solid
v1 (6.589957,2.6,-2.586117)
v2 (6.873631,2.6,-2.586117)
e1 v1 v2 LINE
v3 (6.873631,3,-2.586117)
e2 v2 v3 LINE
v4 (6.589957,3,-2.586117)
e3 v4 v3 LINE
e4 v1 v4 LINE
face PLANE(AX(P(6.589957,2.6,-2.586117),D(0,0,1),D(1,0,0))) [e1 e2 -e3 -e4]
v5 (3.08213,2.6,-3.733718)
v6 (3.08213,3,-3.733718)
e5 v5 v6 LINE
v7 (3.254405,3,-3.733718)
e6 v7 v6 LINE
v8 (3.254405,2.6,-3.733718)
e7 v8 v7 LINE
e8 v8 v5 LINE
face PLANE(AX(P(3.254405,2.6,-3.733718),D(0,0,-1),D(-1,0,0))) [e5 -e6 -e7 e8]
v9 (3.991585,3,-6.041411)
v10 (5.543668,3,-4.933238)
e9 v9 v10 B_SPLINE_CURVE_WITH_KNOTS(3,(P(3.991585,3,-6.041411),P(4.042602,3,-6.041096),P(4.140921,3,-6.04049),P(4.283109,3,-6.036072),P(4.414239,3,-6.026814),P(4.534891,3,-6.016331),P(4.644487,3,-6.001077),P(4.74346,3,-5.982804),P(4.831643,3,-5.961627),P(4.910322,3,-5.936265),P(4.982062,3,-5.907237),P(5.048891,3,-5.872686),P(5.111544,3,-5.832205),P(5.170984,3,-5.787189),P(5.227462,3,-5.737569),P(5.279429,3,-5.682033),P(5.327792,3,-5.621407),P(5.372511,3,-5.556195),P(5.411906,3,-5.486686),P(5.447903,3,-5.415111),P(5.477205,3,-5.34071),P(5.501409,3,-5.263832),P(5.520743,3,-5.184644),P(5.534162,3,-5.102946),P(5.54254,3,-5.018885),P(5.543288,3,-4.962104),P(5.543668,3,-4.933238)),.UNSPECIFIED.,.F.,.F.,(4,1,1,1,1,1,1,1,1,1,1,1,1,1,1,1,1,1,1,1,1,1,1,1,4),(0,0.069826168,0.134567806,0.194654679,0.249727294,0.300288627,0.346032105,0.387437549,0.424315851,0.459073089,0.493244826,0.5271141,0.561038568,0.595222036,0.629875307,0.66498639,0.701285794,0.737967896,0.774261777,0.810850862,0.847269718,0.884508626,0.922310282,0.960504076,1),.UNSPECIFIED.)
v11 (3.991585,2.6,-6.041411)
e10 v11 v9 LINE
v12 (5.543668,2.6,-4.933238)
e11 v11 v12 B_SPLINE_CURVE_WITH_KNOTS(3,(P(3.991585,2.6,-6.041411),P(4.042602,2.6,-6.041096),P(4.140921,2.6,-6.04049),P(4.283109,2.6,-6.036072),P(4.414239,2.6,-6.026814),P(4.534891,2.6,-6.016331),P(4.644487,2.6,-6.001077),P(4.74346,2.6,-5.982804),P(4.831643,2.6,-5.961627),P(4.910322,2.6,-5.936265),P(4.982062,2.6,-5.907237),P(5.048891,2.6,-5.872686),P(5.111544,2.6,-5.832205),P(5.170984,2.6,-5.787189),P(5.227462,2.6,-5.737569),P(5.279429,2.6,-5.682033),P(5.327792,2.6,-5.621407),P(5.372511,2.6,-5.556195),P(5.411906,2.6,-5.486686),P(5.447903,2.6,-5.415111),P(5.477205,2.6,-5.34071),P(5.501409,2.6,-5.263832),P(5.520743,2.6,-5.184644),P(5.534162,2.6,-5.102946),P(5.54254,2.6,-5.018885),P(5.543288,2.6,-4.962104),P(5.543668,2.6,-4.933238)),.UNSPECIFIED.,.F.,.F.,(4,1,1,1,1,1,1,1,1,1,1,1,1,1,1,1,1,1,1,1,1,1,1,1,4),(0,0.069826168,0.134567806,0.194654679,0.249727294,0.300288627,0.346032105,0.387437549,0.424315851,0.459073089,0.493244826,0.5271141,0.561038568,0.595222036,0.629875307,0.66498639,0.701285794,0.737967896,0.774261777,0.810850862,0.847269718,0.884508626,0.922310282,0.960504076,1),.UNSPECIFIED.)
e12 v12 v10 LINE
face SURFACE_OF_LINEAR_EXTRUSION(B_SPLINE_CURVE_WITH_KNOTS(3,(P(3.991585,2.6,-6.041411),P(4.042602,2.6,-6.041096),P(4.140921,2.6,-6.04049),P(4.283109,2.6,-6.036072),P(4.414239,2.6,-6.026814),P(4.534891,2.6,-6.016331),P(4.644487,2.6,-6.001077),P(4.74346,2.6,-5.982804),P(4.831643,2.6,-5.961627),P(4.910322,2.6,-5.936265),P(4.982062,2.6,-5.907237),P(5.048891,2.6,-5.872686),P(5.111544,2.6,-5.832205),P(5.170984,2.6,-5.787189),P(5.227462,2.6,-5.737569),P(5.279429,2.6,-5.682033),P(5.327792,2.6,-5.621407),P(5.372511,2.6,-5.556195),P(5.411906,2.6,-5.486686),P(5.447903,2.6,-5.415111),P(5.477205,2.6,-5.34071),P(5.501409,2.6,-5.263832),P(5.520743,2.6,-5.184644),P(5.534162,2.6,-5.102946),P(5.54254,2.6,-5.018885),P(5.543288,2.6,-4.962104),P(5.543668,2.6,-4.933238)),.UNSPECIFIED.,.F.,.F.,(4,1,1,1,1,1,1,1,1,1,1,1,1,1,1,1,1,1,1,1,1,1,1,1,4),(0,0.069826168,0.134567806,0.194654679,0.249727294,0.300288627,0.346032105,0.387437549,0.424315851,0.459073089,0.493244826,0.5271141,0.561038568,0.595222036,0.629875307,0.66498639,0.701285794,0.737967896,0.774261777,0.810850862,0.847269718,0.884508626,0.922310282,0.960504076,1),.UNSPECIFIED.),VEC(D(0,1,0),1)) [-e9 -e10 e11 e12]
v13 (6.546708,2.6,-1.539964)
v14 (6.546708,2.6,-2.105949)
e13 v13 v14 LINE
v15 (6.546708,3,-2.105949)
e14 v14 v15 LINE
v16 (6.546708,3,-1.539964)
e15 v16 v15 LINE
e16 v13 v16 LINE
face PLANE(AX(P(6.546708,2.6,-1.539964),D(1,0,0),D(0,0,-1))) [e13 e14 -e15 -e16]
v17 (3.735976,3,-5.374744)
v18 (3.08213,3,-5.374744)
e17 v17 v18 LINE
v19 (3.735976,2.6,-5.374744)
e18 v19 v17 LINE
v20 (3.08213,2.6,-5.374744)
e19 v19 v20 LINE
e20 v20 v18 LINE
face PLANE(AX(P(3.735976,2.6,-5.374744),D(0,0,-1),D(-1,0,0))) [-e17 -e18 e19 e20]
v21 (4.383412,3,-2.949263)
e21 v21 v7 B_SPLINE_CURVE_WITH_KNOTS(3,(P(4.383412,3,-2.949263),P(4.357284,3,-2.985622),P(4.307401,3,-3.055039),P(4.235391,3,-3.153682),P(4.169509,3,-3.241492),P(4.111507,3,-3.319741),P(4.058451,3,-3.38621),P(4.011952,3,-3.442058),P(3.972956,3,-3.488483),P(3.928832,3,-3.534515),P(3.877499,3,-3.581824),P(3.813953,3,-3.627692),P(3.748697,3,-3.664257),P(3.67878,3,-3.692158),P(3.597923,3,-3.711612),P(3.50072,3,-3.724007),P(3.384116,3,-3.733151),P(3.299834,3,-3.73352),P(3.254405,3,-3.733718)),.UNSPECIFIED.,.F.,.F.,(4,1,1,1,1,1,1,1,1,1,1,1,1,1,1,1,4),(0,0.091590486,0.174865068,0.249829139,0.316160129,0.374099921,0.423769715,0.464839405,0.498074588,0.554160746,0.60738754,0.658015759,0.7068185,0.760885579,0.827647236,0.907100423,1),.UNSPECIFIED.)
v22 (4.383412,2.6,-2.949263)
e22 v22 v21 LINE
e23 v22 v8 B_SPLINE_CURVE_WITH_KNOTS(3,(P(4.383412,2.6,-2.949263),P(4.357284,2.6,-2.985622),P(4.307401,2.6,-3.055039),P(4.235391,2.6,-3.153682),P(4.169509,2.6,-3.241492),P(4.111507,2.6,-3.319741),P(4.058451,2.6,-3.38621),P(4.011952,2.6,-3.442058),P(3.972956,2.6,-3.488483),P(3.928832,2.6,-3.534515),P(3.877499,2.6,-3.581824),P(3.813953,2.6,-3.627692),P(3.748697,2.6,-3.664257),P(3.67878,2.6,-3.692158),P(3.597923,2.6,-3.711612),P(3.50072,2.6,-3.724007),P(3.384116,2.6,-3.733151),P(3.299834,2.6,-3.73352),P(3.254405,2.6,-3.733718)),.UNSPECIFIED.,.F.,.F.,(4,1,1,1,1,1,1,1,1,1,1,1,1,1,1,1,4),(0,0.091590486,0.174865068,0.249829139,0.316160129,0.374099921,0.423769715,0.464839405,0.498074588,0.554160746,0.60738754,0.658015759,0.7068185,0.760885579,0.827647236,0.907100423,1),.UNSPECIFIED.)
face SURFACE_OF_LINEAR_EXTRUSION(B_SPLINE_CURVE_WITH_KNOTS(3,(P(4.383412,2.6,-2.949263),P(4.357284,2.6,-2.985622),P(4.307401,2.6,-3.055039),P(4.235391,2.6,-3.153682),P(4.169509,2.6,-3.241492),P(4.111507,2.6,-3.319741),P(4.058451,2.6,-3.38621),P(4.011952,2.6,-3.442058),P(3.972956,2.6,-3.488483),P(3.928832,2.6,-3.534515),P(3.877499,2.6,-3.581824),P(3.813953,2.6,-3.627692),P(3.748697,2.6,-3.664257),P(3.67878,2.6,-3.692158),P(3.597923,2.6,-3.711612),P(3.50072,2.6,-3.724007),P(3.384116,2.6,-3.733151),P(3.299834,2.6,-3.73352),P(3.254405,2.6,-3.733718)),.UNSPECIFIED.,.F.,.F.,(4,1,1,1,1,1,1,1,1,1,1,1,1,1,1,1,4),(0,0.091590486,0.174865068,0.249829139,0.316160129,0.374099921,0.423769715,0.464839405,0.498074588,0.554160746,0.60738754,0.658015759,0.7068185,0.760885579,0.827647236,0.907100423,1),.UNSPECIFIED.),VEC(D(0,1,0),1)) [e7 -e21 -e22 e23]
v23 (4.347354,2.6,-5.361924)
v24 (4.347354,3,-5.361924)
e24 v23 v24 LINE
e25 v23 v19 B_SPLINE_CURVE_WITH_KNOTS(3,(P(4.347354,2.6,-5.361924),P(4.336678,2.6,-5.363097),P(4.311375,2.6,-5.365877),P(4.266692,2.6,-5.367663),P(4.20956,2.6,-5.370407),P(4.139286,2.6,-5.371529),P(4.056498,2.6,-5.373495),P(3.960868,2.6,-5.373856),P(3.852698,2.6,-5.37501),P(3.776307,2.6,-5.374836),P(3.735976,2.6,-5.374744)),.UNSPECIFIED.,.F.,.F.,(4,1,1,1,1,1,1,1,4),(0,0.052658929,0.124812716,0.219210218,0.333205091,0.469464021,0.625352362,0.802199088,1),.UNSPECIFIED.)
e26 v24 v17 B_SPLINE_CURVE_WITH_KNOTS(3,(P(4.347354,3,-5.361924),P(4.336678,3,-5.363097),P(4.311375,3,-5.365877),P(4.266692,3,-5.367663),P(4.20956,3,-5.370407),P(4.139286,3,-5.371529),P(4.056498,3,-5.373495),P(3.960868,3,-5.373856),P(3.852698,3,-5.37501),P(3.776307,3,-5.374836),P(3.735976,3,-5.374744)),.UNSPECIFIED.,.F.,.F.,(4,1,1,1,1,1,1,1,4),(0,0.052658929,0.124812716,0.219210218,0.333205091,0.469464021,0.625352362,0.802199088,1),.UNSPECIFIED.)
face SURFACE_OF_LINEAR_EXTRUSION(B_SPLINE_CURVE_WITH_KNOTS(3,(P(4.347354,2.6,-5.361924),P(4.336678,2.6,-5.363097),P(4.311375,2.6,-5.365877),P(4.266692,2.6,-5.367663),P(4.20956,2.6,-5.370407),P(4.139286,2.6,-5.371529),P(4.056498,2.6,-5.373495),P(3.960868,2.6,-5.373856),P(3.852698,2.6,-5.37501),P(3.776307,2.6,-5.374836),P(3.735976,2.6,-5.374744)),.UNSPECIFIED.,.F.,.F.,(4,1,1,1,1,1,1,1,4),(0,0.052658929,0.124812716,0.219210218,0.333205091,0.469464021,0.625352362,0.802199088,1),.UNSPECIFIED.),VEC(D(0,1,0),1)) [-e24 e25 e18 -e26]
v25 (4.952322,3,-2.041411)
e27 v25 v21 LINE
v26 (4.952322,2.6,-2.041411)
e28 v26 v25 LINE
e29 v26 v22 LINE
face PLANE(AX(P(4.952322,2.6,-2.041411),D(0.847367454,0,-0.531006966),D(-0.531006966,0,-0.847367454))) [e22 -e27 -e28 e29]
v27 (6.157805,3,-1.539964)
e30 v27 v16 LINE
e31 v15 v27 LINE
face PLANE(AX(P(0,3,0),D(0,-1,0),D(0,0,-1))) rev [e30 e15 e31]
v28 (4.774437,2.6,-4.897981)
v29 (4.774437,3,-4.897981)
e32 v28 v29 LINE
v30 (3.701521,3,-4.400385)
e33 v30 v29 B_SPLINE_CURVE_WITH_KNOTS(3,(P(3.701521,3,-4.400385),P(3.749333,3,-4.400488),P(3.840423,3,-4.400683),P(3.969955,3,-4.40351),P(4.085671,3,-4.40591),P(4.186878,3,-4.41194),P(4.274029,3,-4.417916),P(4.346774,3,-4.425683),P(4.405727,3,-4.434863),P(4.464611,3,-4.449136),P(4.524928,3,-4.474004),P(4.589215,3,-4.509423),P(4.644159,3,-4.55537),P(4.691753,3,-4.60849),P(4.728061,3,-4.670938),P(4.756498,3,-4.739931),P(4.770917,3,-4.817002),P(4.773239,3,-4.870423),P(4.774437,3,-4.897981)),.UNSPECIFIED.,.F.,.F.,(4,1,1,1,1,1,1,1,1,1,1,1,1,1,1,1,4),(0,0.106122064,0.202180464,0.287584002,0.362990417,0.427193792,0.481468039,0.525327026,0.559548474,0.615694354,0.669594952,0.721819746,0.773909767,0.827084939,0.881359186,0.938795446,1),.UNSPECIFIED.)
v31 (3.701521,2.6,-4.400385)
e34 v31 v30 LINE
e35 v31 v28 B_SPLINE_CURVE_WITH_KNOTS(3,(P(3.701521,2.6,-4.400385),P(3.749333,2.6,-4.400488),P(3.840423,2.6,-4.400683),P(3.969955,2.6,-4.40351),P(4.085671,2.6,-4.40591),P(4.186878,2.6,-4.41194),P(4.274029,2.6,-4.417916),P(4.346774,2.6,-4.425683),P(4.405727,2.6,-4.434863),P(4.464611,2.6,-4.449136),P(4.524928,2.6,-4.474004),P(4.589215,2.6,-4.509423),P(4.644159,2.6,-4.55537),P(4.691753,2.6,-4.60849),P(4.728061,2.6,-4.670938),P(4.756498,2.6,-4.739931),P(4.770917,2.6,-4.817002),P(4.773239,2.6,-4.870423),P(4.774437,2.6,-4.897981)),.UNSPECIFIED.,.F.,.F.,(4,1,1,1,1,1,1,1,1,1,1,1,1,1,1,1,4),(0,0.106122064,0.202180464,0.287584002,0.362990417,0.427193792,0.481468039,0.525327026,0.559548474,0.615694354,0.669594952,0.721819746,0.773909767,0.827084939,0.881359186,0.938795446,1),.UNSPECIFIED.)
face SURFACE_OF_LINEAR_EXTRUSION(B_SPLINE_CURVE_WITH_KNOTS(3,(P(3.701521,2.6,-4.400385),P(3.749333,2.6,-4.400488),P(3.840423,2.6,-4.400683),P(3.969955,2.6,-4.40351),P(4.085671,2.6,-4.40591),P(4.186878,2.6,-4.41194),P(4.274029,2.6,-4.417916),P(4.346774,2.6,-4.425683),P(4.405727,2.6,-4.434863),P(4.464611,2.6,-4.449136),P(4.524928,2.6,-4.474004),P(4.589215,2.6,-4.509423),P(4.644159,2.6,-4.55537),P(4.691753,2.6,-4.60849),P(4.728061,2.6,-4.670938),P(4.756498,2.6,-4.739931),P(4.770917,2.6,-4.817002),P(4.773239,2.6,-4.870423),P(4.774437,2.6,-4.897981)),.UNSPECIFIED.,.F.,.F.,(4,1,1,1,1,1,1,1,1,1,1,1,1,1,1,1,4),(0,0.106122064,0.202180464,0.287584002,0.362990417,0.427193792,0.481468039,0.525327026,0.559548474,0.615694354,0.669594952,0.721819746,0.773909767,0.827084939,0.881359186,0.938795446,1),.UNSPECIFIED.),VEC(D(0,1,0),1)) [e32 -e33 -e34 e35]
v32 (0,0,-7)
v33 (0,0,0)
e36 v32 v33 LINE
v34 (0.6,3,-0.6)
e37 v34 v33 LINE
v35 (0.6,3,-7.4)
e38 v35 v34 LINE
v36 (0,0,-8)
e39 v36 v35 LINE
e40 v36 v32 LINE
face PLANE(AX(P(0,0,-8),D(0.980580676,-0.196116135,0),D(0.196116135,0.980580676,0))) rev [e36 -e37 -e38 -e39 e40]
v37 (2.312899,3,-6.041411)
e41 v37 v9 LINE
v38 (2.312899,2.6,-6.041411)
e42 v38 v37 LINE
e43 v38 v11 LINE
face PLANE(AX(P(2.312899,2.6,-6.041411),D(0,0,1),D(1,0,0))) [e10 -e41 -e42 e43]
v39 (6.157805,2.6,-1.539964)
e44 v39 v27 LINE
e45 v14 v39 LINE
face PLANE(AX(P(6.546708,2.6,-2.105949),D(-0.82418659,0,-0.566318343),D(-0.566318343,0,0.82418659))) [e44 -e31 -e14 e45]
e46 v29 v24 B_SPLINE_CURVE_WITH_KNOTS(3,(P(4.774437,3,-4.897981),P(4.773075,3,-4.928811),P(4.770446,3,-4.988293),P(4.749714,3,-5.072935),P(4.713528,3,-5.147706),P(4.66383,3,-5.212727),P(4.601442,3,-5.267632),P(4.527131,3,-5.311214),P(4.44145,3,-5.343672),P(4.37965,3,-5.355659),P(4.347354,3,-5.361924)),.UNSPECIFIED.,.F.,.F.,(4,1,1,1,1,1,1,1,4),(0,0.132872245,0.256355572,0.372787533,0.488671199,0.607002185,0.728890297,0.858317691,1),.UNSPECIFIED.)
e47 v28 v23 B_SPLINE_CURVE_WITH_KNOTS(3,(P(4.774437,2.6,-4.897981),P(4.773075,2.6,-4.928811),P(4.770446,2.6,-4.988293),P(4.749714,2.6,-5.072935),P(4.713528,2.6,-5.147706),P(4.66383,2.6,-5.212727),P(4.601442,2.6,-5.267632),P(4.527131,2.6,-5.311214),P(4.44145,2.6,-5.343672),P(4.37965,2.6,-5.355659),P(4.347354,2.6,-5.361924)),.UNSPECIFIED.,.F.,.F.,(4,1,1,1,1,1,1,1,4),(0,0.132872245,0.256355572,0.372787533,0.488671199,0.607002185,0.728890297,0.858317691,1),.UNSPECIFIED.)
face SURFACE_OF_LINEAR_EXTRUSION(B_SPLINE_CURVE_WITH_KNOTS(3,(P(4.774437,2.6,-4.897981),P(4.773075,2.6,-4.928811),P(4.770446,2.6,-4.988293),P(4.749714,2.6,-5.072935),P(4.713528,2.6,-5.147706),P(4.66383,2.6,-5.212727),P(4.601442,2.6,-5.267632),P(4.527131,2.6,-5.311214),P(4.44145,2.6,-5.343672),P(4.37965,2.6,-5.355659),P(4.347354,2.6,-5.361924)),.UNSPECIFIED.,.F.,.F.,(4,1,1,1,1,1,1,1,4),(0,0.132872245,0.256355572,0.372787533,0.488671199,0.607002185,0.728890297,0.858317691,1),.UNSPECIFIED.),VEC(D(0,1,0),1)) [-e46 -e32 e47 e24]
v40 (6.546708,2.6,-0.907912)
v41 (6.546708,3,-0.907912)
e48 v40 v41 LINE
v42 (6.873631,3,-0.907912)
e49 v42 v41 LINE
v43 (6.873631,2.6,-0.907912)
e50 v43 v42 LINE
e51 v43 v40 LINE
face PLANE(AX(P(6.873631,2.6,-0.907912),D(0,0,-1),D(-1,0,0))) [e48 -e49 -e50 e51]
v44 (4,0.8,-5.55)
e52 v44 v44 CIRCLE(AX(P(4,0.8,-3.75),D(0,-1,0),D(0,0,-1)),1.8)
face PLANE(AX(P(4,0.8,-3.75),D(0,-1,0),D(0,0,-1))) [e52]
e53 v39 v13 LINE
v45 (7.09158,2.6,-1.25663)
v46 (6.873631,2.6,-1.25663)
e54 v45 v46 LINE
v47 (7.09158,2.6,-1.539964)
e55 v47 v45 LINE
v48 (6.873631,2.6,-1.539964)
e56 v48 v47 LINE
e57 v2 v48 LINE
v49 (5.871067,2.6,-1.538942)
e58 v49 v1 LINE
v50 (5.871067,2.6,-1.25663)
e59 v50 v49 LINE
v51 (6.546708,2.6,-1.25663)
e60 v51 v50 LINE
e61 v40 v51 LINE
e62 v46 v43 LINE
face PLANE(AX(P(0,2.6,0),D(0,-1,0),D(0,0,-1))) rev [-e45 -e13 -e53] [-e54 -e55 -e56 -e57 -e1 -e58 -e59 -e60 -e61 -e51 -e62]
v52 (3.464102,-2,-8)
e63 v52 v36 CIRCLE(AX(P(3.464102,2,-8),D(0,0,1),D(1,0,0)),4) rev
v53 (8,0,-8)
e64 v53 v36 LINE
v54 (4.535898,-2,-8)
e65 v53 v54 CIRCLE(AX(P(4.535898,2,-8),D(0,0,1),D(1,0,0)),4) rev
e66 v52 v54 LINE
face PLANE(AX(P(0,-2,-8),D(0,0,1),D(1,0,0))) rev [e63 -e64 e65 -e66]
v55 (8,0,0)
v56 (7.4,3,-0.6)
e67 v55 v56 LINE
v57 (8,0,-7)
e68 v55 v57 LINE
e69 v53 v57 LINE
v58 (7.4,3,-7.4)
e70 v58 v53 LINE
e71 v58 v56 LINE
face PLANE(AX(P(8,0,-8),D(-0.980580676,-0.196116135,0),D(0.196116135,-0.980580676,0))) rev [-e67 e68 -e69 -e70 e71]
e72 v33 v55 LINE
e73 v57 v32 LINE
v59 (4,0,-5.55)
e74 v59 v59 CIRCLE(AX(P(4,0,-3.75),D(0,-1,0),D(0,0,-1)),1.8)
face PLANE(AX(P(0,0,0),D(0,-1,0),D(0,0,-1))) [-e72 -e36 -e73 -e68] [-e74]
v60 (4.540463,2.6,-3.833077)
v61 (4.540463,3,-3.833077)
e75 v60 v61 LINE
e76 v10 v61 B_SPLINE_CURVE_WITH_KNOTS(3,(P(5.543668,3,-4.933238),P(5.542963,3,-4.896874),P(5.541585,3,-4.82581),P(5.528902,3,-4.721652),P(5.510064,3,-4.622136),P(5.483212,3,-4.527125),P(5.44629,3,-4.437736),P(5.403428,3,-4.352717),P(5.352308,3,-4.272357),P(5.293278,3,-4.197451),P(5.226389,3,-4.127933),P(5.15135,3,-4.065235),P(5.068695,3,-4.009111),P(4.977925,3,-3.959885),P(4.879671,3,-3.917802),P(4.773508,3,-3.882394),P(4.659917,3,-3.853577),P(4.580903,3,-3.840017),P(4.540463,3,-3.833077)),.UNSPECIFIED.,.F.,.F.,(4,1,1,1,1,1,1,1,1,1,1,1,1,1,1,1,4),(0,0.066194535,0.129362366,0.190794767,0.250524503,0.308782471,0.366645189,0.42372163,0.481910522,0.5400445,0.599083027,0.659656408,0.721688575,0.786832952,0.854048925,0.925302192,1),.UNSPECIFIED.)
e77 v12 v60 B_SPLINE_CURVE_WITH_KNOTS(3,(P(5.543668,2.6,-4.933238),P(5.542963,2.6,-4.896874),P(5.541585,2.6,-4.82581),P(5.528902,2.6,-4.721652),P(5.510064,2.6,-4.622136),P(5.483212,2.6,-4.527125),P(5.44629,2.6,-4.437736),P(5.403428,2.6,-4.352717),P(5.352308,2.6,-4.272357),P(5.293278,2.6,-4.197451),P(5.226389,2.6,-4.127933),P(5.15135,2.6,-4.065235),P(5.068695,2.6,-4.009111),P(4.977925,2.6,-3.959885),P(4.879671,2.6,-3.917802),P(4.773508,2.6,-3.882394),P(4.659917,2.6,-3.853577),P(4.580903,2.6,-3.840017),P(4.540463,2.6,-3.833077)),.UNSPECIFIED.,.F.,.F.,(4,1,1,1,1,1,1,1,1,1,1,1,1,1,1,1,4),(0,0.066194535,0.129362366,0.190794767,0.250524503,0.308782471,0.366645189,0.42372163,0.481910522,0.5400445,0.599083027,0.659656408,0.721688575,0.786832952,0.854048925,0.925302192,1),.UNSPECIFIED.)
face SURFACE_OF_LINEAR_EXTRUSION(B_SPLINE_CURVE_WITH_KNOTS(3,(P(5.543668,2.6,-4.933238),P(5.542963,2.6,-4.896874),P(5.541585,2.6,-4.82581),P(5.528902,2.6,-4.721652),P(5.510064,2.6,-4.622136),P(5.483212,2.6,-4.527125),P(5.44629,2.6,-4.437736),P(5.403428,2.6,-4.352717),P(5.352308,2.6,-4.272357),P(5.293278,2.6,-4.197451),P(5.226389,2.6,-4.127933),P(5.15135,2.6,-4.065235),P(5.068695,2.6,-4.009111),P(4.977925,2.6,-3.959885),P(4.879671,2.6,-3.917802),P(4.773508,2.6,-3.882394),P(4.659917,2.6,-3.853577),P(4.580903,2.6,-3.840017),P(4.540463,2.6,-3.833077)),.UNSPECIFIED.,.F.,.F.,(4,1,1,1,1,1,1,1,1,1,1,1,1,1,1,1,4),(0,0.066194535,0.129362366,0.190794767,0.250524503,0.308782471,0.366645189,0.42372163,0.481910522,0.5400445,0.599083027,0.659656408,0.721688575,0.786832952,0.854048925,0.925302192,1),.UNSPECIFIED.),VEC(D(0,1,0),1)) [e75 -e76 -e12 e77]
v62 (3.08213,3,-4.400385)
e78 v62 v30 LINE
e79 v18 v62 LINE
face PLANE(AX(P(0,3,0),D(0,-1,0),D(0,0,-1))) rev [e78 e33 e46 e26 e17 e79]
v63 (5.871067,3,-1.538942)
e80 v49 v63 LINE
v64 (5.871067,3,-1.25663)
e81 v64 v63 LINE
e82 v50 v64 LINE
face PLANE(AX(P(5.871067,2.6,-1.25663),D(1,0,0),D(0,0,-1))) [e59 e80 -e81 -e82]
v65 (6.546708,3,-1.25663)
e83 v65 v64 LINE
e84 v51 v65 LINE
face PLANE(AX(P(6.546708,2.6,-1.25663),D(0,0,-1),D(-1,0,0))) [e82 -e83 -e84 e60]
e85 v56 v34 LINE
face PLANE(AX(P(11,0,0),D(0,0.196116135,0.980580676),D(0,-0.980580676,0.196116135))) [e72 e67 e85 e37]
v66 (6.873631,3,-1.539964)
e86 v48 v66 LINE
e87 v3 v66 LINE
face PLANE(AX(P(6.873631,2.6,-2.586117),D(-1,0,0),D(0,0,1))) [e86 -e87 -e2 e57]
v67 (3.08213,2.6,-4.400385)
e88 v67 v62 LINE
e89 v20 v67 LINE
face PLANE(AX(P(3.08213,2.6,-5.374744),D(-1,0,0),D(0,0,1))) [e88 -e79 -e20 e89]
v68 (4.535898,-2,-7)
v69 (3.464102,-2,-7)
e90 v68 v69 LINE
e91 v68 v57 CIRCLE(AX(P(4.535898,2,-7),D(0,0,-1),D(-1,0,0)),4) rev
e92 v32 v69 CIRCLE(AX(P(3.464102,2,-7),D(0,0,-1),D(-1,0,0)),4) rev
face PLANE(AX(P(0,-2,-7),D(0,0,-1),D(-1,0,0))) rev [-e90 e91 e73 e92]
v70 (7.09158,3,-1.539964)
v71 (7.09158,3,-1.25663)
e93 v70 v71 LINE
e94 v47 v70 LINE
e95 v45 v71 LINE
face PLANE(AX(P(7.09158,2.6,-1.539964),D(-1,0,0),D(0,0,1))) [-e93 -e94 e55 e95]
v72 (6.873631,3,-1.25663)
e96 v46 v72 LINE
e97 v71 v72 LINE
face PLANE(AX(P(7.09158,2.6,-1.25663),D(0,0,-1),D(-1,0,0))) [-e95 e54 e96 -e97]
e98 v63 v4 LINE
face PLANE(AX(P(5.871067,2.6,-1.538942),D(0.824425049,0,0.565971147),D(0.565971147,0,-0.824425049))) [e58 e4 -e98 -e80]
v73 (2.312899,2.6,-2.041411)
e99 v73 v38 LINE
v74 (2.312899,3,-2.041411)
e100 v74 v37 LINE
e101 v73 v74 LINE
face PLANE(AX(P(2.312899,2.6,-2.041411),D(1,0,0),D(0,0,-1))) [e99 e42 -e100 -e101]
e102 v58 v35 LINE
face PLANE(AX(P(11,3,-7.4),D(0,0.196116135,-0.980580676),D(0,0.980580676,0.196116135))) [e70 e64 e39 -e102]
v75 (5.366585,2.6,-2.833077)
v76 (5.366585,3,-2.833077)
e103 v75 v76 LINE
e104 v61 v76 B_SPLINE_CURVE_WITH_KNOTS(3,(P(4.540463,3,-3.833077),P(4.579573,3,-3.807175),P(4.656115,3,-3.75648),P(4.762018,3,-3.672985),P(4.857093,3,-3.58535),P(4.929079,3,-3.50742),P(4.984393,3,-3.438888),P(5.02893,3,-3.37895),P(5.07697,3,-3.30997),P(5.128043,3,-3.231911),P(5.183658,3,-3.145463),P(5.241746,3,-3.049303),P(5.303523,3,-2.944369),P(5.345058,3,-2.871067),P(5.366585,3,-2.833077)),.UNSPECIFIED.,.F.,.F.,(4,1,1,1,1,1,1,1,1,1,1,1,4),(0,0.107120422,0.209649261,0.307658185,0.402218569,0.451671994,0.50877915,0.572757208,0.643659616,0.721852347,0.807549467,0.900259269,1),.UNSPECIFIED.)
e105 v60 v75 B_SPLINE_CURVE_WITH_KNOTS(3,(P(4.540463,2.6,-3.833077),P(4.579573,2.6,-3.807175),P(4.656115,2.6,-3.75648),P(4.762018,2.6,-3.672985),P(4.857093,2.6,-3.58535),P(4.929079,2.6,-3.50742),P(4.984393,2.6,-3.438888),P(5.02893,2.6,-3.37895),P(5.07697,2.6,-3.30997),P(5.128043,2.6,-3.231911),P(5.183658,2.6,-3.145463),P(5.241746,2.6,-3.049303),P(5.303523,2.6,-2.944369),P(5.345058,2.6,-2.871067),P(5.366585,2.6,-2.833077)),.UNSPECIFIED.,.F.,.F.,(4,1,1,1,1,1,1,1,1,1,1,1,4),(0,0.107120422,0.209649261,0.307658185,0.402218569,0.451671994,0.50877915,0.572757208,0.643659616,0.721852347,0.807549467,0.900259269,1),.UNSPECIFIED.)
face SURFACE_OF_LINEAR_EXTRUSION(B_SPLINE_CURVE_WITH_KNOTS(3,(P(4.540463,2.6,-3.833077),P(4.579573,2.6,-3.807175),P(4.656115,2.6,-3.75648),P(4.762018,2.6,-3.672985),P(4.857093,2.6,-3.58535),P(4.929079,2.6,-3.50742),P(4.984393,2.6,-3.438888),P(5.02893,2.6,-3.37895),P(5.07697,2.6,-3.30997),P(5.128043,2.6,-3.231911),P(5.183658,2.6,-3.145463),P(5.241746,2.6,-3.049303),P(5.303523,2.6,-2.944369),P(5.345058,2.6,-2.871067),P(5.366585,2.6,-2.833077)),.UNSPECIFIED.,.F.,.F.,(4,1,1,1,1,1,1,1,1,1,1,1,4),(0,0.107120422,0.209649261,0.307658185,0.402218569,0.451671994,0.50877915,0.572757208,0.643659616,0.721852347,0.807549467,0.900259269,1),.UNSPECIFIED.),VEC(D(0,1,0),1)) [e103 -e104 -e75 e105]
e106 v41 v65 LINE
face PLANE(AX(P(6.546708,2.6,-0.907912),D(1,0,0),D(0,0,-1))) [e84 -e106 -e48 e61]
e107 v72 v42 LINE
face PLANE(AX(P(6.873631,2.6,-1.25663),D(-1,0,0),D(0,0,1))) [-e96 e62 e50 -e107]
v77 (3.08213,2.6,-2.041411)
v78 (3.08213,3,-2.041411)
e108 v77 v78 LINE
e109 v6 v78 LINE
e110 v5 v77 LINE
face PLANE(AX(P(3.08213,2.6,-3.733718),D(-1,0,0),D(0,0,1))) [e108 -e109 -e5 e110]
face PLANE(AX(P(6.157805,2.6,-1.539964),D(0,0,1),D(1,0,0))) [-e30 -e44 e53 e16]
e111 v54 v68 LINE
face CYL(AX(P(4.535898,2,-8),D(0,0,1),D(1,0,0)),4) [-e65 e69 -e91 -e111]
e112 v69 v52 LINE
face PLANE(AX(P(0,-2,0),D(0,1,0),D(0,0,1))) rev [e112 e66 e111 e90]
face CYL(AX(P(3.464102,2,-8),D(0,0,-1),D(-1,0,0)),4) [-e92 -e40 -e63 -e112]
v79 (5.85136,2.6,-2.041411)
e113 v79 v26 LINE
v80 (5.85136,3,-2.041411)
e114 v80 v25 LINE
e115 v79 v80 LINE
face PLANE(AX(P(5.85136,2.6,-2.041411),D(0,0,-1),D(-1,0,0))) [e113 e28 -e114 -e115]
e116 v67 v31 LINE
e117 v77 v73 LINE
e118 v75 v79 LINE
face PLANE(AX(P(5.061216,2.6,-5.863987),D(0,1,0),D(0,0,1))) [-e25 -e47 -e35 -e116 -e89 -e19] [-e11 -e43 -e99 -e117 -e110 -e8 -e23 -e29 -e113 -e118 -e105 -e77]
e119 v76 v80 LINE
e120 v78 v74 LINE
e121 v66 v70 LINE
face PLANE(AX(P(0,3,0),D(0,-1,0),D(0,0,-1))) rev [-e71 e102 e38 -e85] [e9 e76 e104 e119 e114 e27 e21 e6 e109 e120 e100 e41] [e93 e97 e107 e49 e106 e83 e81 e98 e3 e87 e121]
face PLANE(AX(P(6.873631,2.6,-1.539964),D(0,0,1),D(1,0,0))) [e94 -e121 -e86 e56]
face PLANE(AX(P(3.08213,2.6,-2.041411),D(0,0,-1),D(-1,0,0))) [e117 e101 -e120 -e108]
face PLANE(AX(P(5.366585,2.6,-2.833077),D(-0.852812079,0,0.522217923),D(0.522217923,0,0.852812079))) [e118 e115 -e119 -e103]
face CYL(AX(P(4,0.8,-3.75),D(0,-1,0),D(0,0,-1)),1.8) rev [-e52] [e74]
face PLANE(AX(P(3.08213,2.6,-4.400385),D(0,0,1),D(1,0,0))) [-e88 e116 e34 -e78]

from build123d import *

# Parameters (mm, degrees)
SKETCH1_W               = 8
SKETCH1_H               = 8
BOSS_EXTRUDE1_DEPTH     = 3
CUT_EXTRUDE1_DEPTH      = 12.704699911
CUT_EXTRUDE1_DEPTH_BACK = 12.704699911
CUT_EXTRUDE2_DEPTH      = 11
SKETCH4_R               = 1.8
CUT_EXTRUDE3_DEPTH      = 0.8
SKETCH5_W               = 8
SKETCH5_H               = 1
BOSS_EXTRUDE2_DEPTH     = 2
FILLET1_R               = 4
CUT_EXTRUDE4_DEPTH      = 0.4
CUT_EXTRUDE5_DEPTH      = 0.4


with BuildPart() as part:
    # Sketch1 → Boss-Extrude1 (new body)
    with BuildSketch(Plane(origin=(0, 0, 0), x_dir=(1, 0, 0), z_dir=(0, 1, 0))):
        with Locations((4, 4)):
            Rectangle(SKETCH1_W, SKETCH1_H)
    extrude(amount=BOSS_EXTRUDE1_DEPTH)

    # Sketch2 → Cut-Extrude1 (cut, two sides: drawn at the far end of the back side and taken through both)
    with BuildSketch(Plane.XY.offset(-CUT_EXTRUDE1_DEPTH_BACK)):
        Polygon((0, 0), (0.6, 3), (0, 3), align=None)
        Polygon((8, 0), (7.4, 3), (8, 3), align=None)
    extrude(amount=CUT_EXTRUDE1_DEPTH + CUT_EXTRUDE1_DEPTH_BACK, mode=Mode.SUBTRACT)

    # Sketch3 → Cut-Extrude2 (cut)
    with BuildSketch(Plane(origin=(0, 0, 0), x_dir=(0, 0, -1), z_dir=(1, 0, 0))):
        Polygon((0, 0), (0.6, 3), (0, 3), align=None)
        Polygon((8, 3), (7.4, 3), (8, 0), align=None)
    extrude(amount=CUT_EXTRUDE2_DEPTH, mode=Mode.SUBTRACT)

    # Sketch4 → Cut-Extrude3 (cut)
    with BuildSketch(Plane.XZ):
        with Locations(Location((4, -3.75, 0), (0, 0, 270))):
            Circle(SKETCH4_R)
    extrude(amount=-CUT_EXTRUDE3_DEPTH, mode=Mode.SUBTRACT)

    # Sketch5 → Boss-Extrude2 (add)
    with BuildSketch(Plane.XZ):
        with Locations((4, -7.5)):
            Rectangle(SKETCH5_W, SKETCH5_H)
    extrude(amount=BOSS_EXTRUDE2_DEPTH)

    # Fillet1
    # the kernel refuses this fillet: 4 mm, written as the material it takes off along each edge
    with BuildSketch(Plane(origin=(8, -2, -16.660254038), x_dir=(0, 1, 0), z_dir=(0, 0, 1)), Plane(origin=(0, -2, 1.660254038), x_dir=(0, 1, 0), z_dir=(0, 0, -1))) as fillet1_piece_1:
        with BuildLine():
            CenterArc((4, 3.464101615), FILLET1_R, 180, 60)
            Line((0, 3.464101615), (-0.08, 3.464101615))
            Line((-0.08, 3.464101615), (-0.08, 0))
            Line((-0.08, 0), (0, -0.08))
            ThreePointArc((0, -0.08), (1, -0.08), (1.96, -0.069282032))
            Line((1.96, -0.069282032), (2, 0))
        make_face()
    extrude(amount=18.320508076, mode=Mode.SUBTRACT)

    # Sketch6 → Cut-Extrude4 (cut)
    with BuildSketch(Plane(origin=(0, 3, 0), x_dir=(1, 0, 0), z_dir=(0, 1, 0))):
        with BuildLine():
            Line((2.312898911, 2.041410717), (2.312898911, 6.041410717))
            Line((2.312898911, 6.041410717), (3.991584808, 6.041410717))
            add(Edge.make_bspline(
                [(3.991584808, 6.041410717), (4.042601732, 6.041096301), (4.140920681, 6.040490364), (4.283109063, 6.036071747), (4.414238667, 6.026814487), (4.534891188, 6.016330564), (4.644487122, 6.001077132), (4.74345979, 5.982803671), (4.831642566, 5.961627249), (4.910322089, 5.936265049), (4.982061831, 5.90723713), (5.04889092, 5.87268574), (5.111544162, 5.83220454), (5.170983849, 5.787188805), (5.227461685, 5.737569368), (5.279429347, 5.682033053), (5.32779225, 5.621406813), (5.372511371, 5.556195062), (5.411906117, 5.48668575), (5.447902572, 5.415111184), (5.477205044, 5.340709703), (5.50140862, 5.263831792), (5.52074281, 5.184644366), (5.534162371, 5.102946099), (5.542540058, 5.018884869), (5.543287935, 4.962103945), (5.543668142, 4.93323764)],
                knots=[0, 0, 0, 0, 1.675828044, 3.229627355, 4.67171229, 5.993455049, 7.206927059, 8.304770529, 9.29850117, 10.183580433, 11.017754134, 11.837875825, 12.650738409, 13.464925643, 14.285328857, 15.117007378, 15.959673368, 16.830859064, 17.711229498, 18.58228265, 19.460420693, 20.334473227, 21.228207035, 22.135446768, 23.052097822, 24, 24, 24, 24], degree=3))
            add(Edge.make_bspline(
                [(5.543668142, 4.93323764), (5.542962916, 4.896874176), (5.541584712, 4.825809944), (5.528901745, 4.721651895), (5.5100643, 4.622136315), (5.483211668, 4.527125334), (5.446289845, 4.437736414), (5.403428122, 4.352717347), (5.352308317, 4.272356517), (5.293277733, 4.19745058), (5.226389218, 4.127933229), (5.151349641, 4.065235076), (5.06869476, 4.009111084), (4.977924564, 3.959884897), (4.879671091, 3.917801842), (4.77350828, 3.882394441), (4.659916733, 3.853576761), (4.580902516, 3.840017181), (4.540463013, 3.833077384)],
                knots=[0, 0, 0, 0, 1.05911256, 2.069797862, 3.05271628, 4.008392045, 4.940519534, 5.866323021, 6.779546087, 7.71056835, 8.640711998, 9.585328432, 10.554502533, 11.547017206, 12.589327225, 13.664782803, 14.804835066, 16, 16, 16, 16], degree=3))
            add(Edge.make_bspline(
                [(4.540463013, 3.833077384), (4.579572554, 3.807174767), (4.656115253, 3.756479818), (4.762017587, 3.672984601), (4.857092756, 3.585349912), (4.929078878, 3.507419696), (4.984392794, 3.438888442), (5.028929947, 3.378950347), (5.076970406, 3.309970293), (5.128042999, 3.231910907), (5.183657562, 3.145462828), (5.241745689, 3.049302835), (5.303522957, 2.944368887), (5.345058377, 2.871067212), (5.366584808, 2.833077384)],
                knots=[0, 0, 0, 0, 1.285445069, 2.515791127, 3.691898215, 4.826622834, 5.420063933, 6.105349801, 6.873086501, 7.723915395, 8.66222816, 9.690593598, 10.803111229, 12, 12, 12, 12], degree=3))
            Line((5.366584808, 2.833077384), (5.851360449, 2.041410717))
            Line((5.851360449, 2.041410717), (4.952321988, 2.041410717))
            Line((4.952321988, 2.041410717), (4.383411731, 2.949263281))
            add(Edge.make_bspline(
                [(4.383411731, 2.949263281), (4.357283981, 2.985622121), (4.307400733, 3.055038622), (4.235391184, 3.153681722), (4.169508837, 3.241491798), (4.111507042, 3.319740728), (4.058450932, 3.386209972), (4.011951502, 3.442057857), (3.972955886, 3.488482798), (3.928832249, 3.534515131), (3.877499082, 3.581823547), (3.813952721, 3.627691749), (3.748696505, 3.664257396), (3.678779681, 3.692157844), (3.597922987, 3.71161189), (3.500720436, 3.724006591), (3.384115753, 3.733151261), (3.299833928, 3.733519777), (3.254405321, 3.73371841)],
                knots=[0, 0, 0, 0, 1.465447777, 2.797841088, 3.997266218, 5.05856206, 5.985598736, 6.780315439, 7.437430484, 7.969193402, 8.866571936, 9.718200644, 10.52825214, 11.309096006, 12.174169268, 13.242355782, 14.513606761, 16, 16, 16, 16], degree=3))
            Line((3.254405321, 3.73371841), (3.08212968, 3.73371841))
            Line((3.08212968, 3.73371841), (3.08212968, 2.041410717))
            Line((3.08212968, 2.041410717), (2.312898911, 2.041410717))
        make_face()
        with BuildLine():
            Line((3.08212968, 4.400385076), (3.701520706, 4.400385076))
            add(Edge.make_bspline(
                [(3.701520706, 4.400385076), (3.749332843, 4.400487541), (3.840423044, 4.400682752), (3.969955122, 4.403510317), (4.085670885, 4.405910235), (4.186877859, 4.411940131), (4.274028855, 4.417916326), (4.346774263, 4.425683211), (4.405726987, 4.434863419), (4.464610849, 4.449136231), (4.52492793, 4.474003789), (4.589214527, 4.509422512), (4.644158691, 4.555370201), (4.691753027, 4.608490376), (4.728060837, 4.670937972), (4.756498441, 4.739930879), (4.770916908, 4.817002181), (4.773239296, 4.87042263), (4.774437372, 4.89798123)],
                knots=[0, 0, 0, 0, 1.697953026, 3.23488743, 4.60134403, 5.807846676, 6.835100678, 7.703488618, 8.405232423, 8.952775585, 9.851109663, 10.713519226, 11.549115941, 12.382556273, 13.233359028, 14.101746968, 15.020727134, 16, 16, 16, 16], degree=3))
            add(Edge.make_bspline(
                [(4.774437372, 4.89798123), (4.773074786, 4.928811222), (4.770445895, 4.98829272), (4.749714088, 5.072935459), (4.713527564, 5.147705664), (4.663829732, 5.212726785), (4.601441933, 5.267631557), (4.527131165, 5.311213996), (4.441449505, 5.343672387), (4.379650359, 5.355659208), (4.347354039, 5.361923538)],
                knots=[0, 0, 0, 0, 1.062977961, 2.050844577, 2.982300261, 3.90936959, 4.856017476, 5.831122378, 6.86654153, 8, 8, 8, 8], degree=3))
            add(Edge.make_bspline(
                [(4.347354039, 5.361923538), (4.336678458, 5.363096555), (4.311375089, 5.365876852), (4.266692338, 5.367662514), (4.20955971, 5.370407271), (4.139285669, 5.371528992), (4.056498042, 5.373495271), (3.960867626, 5.373856329), (3.852698247, 5.375009885), (3.776307493, 5.374835906), (3.735975834, 5.374744051)],
                knots=[0, 0, 0, 0, 0.42127143, 0.998501726, 1.753681744, 2.66564073, 3.755712164, 5.002818897, 6.417592707, 8, 8, 8, 8], degree=3))
            Line((3.735975834, 5.374744051), (3.08212968, 5.374744051))
            Line((3.08212968, 5.374744051), (3.08212968, 4.400385076))
        make_face(mode=Mode.SUBTRACT)
    extrude(amount=-CUT_EXTRUDE4_DEPTH, mode=Mode.SUBTRACT)

    # Sketch7 → Cut-Extrude5 (cut)
    with BuildSketch(Plane(origin=(0, 3, 0), x_dir=(1, 0, 0), z_dir=(0, 1, 0))):
        Polygon((6.546707708, 0.907912363), (6.546707708, 1.256630312), (5.871066683, 1.256630312), (5.871066683, 1.53894201), (6.589956907, 2.586117491), (6.873630785, 2.586117491), (6.873630785, 1.539963645), (7.091579503, 1.539963645), (7.091579503, 1.256630312), (6.873630785, 1.256630312), (6.873630785, 0.907912363), align=None)
        Polygon((6.546707708, 1.539963645), (6.546707708, 2.105949222), (6.157805465, 1.539963645), align=None, mode=Mode.SUBTRACT)
    extrude(amount=-CUT_EXTRUDE5_DEPTH, mode=Mode.SUBTRACT)


solid = part.part
